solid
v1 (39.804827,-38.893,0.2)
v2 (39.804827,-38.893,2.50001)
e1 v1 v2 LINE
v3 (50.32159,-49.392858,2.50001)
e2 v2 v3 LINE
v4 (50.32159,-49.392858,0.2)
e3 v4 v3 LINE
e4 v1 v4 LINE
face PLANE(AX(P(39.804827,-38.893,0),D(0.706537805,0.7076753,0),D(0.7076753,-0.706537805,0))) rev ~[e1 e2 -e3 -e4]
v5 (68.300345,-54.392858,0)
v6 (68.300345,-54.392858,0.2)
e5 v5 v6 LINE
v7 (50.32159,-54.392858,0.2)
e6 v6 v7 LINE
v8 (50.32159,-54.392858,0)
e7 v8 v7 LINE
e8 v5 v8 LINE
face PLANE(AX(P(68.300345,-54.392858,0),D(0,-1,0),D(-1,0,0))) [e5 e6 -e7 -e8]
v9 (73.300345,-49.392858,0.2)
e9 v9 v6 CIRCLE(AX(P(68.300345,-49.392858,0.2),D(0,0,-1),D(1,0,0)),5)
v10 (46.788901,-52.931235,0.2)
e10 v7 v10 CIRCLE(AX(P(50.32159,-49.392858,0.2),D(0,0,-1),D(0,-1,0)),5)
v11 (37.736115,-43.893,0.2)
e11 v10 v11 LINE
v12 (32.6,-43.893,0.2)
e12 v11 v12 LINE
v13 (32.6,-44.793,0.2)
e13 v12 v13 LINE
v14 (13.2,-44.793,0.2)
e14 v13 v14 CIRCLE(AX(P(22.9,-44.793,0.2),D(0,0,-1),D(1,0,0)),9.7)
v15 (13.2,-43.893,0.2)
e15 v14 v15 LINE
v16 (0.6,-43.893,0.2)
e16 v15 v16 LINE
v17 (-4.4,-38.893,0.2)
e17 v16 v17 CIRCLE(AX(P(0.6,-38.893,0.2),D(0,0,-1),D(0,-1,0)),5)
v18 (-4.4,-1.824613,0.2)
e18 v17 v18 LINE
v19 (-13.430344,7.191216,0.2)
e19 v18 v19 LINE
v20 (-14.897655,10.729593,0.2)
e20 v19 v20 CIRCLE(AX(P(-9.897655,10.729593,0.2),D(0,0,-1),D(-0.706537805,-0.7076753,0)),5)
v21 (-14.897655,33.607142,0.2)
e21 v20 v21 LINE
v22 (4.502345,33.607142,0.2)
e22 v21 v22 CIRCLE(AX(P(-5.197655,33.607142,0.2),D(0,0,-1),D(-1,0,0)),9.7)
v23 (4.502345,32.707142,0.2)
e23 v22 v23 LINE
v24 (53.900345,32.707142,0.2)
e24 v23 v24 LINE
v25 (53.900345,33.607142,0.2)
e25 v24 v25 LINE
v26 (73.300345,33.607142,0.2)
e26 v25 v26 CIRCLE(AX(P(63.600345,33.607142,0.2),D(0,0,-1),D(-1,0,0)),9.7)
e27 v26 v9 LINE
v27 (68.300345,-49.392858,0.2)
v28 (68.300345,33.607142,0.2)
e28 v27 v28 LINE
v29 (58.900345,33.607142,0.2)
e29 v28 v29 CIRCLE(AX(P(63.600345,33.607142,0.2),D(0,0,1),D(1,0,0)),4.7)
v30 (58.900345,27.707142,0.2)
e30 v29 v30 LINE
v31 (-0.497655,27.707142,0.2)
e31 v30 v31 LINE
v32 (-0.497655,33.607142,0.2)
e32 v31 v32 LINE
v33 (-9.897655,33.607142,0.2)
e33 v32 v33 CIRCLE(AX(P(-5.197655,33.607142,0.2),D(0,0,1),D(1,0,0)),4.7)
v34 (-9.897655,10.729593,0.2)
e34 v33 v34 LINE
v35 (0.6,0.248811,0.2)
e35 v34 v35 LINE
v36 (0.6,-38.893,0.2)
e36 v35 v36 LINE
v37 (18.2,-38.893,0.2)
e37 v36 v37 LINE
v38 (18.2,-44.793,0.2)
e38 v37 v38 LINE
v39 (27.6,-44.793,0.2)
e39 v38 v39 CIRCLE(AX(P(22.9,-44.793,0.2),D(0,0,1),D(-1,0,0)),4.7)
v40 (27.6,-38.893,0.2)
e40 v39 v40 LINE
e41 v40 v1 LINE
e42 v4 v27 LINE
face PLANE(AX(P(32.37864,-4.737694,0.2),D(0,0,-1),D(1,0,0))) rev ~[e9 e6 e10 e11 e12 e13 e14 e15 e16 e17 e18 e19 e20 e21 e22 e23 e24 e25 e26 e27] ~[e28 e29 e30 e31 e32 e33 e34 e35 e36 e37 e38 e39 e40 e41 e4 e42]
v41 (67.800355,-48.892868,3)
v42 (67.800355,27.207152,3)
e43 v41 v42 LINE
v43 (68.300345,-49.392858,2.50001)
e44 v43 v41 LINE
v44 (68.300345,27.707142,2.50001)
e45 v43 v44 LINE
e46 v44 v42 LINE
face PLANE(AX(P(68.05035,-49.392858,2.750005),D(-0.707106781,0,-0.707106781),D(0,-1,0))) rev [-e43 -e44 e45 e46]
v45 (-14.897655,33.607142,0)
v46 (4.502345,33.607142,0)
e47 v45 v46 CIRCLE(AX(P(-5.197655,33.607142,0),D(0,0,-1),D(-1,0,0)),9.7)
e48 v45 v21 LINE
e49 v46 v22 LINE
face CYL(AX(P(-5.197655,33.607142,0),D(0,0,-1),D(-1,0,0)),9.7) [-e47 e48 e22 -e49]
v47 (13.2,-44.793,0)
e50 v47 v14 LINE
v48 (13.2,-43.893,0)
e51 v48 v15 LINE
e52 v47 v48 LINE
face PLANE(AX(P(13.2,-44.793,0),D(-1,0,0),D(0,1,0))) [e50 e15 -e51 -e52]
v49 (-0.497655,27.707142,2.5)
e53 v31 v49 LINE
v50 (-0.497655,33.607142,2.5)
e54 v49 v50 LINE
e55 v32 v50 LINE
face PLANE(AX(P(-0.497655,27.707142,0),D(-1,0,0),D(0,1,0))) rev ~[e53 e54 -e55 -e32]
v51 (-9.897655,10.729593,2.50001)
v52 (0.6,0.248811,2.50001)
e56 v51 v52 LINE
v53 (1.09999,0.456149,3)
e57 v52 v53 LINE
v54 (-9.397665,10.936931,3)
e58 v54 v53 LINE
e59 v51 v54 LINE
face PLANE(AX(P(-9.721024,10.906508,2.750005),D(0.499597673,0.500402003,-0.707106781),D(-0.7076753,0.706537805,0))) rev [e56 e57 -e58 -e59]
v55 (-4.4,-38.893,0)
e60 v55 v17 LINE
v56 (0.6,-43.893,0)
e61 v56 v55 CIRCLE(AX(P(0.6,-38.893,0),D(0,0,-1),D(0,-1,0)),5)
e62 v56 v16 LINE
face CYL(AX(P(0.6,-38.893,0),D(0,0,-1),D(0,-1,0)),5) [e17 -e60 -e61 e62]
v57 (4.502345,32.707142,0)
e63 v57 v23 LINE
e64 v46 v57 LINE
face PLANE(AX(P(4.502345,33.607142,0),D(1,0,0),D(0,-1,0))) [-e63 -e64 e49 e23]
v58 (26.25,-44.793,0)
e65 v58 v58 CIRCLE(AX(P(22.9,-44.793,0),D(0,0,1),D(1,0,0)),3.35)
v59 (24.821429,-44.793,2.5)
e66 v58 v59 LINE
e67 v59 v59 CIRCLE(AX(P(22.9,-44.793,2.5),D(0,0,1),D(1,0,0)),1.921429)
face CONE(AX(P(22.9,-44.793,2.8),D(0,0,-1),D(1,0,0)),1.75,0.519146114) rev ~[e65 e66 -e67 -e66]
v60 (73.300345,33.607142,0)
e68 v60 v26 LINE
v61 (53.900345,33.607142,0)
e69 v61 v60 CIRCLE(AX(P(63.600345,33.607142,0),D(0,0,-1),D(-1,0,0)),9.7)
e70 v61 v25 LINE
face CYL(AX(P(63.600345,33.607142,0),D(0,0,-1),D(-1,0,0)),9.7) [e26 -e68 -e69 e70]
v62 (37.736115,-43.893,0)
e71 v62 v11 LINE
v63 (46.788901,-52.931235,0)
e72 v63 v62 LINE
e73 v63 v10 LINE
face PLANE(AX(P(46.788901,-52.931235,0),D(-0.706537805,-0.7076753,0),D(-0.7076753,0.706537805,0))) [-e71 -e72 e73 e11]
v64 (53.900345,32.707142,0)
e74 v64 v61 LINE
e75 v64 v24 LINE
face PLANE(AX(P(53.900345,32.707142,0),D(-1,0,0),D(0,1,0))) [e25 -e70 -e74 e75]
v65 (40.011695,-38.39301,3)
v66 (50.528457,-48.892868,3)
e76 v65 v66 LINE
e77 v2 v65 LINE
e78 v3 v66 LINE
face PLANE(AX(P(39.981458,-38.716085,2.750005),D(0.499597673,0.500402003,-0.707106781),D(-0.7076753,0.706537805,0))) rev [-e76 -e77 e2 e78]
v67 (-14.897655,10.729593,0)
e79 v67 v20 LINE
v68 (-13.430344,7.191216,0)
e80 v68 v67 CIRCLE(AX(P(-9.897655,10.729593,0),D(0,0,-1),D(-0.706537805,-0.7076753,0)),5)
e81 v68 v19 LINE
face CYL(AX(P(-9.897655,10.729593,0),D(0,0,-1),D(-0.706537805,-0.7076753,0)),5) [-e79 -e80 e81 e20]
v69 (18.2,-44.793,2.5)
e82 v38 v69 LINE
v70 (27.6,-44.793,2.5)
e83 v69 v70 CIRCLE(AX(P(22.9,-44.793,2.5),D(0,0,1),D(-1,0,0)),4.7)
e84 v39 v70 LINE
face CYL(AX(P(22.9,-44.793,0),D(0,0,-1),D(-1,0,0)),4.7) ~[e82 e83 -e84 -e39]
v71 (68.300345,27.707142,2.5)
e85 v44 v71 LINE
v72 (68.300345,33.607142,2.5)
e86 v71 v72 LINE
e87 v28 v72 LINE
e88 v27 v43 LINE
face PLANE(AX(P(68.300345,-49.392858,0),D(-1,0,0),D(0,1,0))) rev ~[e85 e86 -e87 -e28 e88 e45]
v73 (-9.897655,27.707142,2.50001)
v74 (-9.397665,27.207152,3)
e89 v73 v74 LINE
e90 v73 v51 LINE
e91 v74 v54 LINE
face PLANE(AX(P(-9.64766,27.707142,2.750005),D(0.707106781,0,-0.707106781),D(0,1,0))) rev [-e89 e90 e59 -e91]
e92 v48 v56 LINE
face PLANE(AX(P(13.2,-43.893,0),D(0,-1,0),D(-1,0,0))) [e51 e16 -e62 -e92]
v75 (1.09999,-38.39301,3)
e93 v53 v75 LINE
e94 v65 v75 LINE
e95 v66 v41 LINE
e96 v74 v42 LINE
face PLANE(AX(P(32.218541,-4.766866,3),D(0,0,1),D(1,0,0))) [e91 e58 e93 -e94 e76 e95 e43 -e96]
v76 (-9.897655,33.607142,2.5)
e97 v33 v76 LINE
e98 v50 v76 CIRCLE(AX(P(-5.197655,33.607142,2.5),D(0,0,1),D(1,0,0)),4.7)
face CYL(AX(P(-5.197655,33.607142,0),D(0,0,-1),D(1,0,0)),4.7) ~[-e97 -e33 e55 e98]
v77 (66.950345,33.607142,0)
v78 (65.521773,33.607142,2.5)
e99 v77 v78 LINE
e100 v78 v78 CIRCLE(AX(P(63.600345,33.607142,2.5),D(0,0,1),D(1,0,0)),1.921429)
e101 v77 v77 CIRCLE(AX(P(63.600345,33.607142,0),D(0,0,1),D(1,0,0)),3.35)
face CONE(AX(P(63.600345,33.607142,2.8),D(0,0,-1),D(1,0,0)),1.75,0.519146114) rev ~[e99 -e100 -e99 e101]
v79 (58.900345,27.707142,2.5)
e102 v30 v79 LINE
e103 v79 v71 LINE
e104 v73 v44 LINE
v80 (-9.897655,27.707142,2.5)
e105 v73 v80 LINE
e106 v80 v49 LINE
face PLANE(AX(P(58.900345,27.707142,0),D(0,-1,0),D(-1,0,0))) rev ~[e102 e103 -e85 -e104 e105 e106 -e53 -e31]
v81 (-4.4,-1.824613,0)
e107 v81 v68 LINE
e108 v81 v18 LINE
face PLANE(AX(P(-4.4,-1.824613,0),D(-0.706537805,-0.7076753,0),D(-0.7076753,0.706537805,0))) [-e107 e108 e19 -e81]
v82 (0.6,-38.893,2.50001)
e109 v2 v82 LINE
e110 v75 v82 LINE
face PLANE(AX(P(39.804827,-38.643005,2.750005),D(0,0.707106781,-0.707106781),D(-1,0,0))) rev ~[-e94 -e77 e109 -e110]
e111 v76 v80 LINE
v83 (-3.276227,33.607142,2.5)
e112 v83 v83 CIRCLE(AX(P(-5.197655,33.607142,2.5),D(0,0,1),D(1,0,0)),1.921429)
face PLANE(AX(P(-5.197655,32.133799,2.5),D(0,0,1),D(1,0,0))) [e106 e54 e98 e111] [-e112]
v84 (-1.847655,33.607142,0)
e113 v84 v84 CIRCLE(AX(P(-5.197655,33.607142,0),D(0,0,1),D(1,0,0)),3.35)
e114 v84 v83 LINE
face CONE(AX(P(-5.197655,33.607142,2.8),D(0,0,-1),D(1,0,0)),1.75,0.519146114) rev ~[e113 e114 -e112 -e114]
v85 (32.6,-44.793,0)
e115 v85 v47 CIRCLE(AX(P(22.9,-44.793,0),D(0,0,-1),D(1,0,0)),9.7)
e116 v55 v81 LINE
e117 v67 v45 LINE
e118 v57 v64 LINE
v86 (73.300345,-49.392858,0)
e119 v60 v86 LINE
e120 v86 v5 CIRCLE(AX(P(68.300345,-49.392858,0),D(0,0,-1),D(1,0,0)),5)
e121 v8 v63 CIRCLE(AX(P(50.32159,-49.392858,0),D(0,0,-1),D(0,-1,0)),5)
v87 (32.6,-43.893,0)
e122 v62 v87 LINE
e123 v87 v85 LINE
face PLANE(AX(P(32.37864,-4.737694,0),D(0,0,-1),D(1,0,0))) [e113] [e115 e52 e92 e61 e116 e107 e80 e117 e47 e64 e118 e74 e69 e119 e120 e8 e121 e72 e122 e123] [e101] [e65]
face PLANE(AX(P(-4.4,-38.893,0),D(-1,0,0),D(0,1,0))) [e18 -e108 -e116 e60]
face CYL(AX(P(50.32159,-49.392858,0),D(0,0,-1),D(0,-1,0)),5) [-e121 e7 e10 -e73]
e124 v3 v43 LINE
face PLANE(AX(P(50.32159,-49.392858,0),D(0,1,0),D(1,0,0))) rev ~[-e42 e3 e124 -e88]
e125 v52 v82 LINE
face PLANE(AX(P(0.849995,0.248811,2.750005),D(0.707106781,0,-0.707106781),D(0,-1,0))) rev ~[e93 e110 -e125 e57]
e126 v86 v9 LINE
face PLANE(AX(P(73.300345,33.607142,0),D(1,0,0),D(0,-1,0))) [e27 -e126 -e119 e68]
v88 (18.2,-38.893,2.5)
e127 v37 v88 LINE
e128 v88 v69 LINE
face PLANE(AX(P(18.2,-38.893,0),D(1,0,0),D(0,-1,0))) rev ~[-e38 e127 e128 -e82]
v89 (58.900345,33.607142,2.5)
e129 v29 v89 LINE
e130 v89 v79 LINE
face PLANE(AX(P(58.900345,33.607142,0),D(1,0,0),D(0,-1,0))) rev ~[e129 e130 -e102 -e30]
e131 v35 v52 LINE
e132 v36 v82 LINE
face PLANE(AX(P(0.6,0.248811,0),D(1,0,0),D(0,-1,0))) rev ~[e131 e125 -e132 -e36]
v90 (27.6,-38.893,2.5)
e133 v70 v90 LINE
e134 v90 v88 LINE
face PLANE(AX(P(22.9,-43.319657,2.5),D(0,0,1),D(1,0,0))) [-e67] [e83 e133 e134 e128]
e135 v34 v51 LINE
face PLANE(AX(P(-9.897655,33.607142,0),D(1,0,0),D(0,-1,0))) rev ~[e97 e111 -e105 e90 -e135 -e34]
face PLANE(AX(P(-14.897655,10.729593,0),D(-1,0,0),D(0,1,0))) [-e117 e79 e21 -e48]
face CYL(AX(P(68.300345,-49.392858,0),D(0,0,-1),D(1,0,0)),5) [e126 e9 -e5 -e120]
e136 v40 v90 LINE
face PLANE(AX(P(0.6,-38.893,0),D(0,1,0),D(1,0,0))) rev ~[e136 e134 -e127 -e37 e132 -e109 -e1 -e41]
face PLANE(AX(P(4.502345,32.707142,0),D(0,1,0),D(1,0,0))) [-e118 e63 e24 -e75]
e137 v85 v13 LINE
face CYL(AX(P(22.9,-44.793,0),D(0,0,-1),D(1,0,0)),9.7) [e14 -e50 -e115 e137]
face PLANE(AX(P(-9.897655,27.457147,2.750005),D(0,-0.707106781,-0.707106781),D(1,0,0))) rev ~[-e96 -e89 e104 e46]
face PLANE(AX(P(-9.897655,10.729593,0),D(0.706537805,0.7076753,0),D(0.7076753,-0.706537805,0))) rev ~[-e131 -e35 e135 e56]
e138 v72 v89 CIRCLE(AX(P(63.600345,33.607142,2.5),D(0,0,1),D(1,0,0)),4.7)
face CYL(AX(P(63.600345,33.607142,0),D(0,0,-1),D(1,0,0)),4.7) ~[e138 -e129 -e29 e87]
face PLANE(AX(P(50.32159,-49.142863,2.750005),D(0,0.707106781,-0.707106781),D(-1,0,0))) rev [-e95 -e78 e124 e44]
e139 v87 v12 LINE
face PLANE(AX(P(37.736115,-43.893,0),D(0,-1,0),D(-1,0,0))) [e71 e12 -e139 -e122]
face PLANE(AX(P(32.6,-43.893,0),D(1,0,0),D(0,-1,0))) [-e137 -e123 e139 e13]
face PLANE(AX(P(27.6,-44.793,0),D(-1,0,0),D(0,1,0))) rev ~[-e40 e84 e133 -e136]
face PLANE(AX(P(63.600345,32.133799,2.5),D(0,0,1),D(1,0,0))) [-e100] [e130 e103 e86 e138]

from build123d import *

# Parameters (mm, degrees)
F0_R     = 1.75
F1_DEPTH = 3
F2_SIZE2 = 2.8
F2_SIZE  = 1.6
F4_DEPTH = 0.5
F5_SIZE  = 0.49999
F7_DEPTH = 0.2


# Not quite as in the source:
# - a fillet or chamfer is up to 0.001 mm smaller than in the source, because OpenCascade refuses the exact size


with BuildPart() as f1:
    # F0 (on Top) → F1 (new body)
    with BuildSketch(Plane.XY):
        with BuildLine():
            Line((18.2, -38.893), (18.2, -44.793))
            ThreePointArc((18.2, -44.793), (22.9, -49.493), (27.6, -44.793))
            Line((27.6, -44.793), (27.6, -38.893))
            Line((27.6, -38.893), (39.8048274606, -38.893))
            Line((39.8048274606, -38.893), (50.3215900894, -49.3928583233))
            Line((50.3215900894, -49.3928583233), (68.3003446043, -49.3928583233))
            Line((68.3003446043, -49.3928583233), (68.3003446043, 33.6071416767))
            ThreePointArc((68.3003446043, 33.6071416767), (63.6003446043, 38.3071416767), (58.9003446043, 33.6071416767))
            Line((58.9003446043, 33.6071416767), (58.9003446043, 27.7071416767))
            Line((58.9003446043, 27.7071416767), (-0.4976553957, 27.7071416767))
            Line((-0.4976553957, 27.7071416767), (-0.4976553957, 33.6071416767))
            ThreePointArc((-0.4976553957, 33.6071416767), (-5.1976553957, 38.3071416767), (-9.8976553957, 33.6071416767))
            Line((-9.8976553957, 33.6071416767), (-9.8976553957, 10.7295926865))
            Line((-9.8976553957, 10.7295926865), (0.6, 0.248810884))
            Line((0.6, 0.248810884), (0.6, -38.893))
            Line((0.6, -38.893), (18.2, -38.893))
        make_face()
        with Locations((22.9, -44.793)):
            Circle(F0_R, mode=Mode.SUBTRACT)
        with Locations((-5.1976553957, 33.6071416767)):
            Circle(F0_R, mode=Mode.SUBTRACT)
        with Locations((63.6003446043, 33.6071416767)):
            Circle(F0_R, mode=Mode.SUBTRACT)
    extrude(amount=F1_DEPTH)

    # F2
    f2_edges = [f1.edges().sort_by_distance(p)[0] for p in [
        (21.15, -44.793, 0),
        (-6.947655, 33.607142, 0),
        (61.850345, 33.607142, 0),
    ]]
    f2_side = f1.faces().sort_by_distance((33.412828, -5.806914, 0))[0]
    chamfer(f2_edges, length=F2_SIZE, length2=F2_SIZE2, reference=f2_side)

    # F3 (on face) → F4 (cut)
    with BuildSketch(Plane.XY.offset(3)):
        with BuildLine():
            Line((-9.8976553957, 27.7071416767), (-0.4976553957, 27.7071416767))
            Line((-0.4976553957, 27.7071416767), (-0.4976553957, 33.6071416767))
            ThreePointArc((-0.4976553957, 33.6071416767), (-5.1976553957, 38.3071416767), (-9.8976553957, 33.6071416767))
            Line((-9.8976553957, 33.6071416767), (-9.8976553957, 27.7071416767))
        make_face()
        with BuildLine():
            Line((58.9003446043, 33.6071416767), (58.9003446043, 27.7071416767))
            Line((58.9003446043, 27.7071416767), (68.3003446043, 27.7071416767))
            Line((68.3003446043, 27.7071416767), (68.3003446043, 33.6071416767))
            ThreePointArc((68.3003446043, 33.6071416767), (63.6003446043, 38.3071416767), (58.9003446043, 33.6071416767))
        make_face()
        with BuildLine():
            Line((27.6, -38.893), (18.2, -38.893))
            Line((18.2, -38.893), (18.2, -44.793))
            ThreePointArc((18.2, -44.793), (22.9, -49.493), (27.6, -44.793))
            Line((27.6, -44.793), (27.6, -38.893))
        make_face()
    extrude(amount=-F4_DEPTH, mode=Mode.SUBTRACT)

    # F5 (size 0.5 in the source; OpenCascade refuses exactly that, so slightly less here)
    f5_edges = [f1.edges().sort_by_distance(p)[0] for p in [
        (29.201345, 27.707142, 3),
        (-9.897655, 19.218367, 3),
        (-4.648828, 5.489202, 3),
        (0.6, -19.322095, 3),
        (20.202414, -38.893, 3),
        (45.063209, -44.142929, 3),
        (59.310967, -49.392858, 3),
        (68.300345, -10.842858, 3),
    ]]
    chamfer(f5_edges, length=F5_SIZE)

    # F6 (on face) → F7 (join)
    with BuildSketch(Plane(origin=(0, 0, 0), x_dir=(1, 0, 0), z_dir=(0, 0, -1))):
        with BuildLine():
            ThreePointArc((0.6, 43.893), (-2.9355339059, 42.4285339059), (-4.4, 38.893))
            Line((-4.4, 38.893), (-4.4, 1.824613149))
            Line((-4.4, 1.824613149), (-13.4303444218, -7.1912161881))
            ThreePointArc((-13.4303444218, -7.1912161881), (-14.5162831751, -8.8143179191), (-14.8976553957, -10.7295926865))
            Line((-14.8976553957, -10.7295926865), (-14.8976553957, -33.6071416767))
            ThreePointArc((-14.8976553957, -33.6071416767), (-5.1976553957, -43.3071416767), (4.5023446043, -33.6071416767))
            Line((4.5023446043, -33.6071416767), (4.5023446043, -32.7071416767))
            Line((4.5023446043, -32.7071416767), (53.9003446043, -32.7071416767))
            Line((53.9003446043, -32.7071416767), (53.9003446043, -33.6071416767))
            ThreePointArc((53.9003446043, -33.6071416767), (63.6003446043, -43.3071416767), (73.3003446043, -33.6071416767))
            Line((73.3003446043, -33.6071416767), (73.3003446043, 49.3928583233))
            ThreePointArc((73.3003446043, 49.3928583233), (71.8358785102, 52.9283922293), (68.3003446043, 54.3928583233))
            Line((68.3003446043, 54.3928583233), (50.3215900894, 54.3928583233))
            ThreePointArc((50.3215900894, 54.3928583233), (48.4100308427, 54.0130251219), (46.7889010633, 52.9312348218))
            Line((46.7889010633, 52.9312348218), (37.736115085, 43.893))
            Line((37.736115085, 43.893), (32.6, 43.893))
            Line((32.6, 43.893), (32.6, 44.793))
            ThreePointArc((32.6, 44.793), (22.9, 54.493), (13.2, 44.793))
            Line((13.2, 44.793), (13.2, 43.893))
            Line((13.2, 43.893), (0.6, 43.893))
        make_face()
        with BuildLine():
            Line((-9.8976553957, -33.6071416767), (-9.8976553957, -10.7295926865))
            Line((-9.8976553957, -10.7295926865), (0.6, -0.248810884))
            Line((0.6, -0.248810884), (0.6, 38.893))
            Line((0.6, 38.893), (18.2, 38.893))
            Line((18.2, 38.893), (18.2, 44.793))
            ThreePointArc((18.2, 44.793), (22.9, 49.493), (27.6, 44.793))
            Line((27.6, 44.793), (27.6, 38.893))
            Line((27.6, 38.893), (39.8048274606, 38.893))
            Line((39.8048274606, 38.893), (50.3215900894, 49.3928583233))
            Line((50.3215900894, 49.3928583233), (68.3003446043, 49.3928583233))
            Line((68.3003446043, 49.3928583233), (68.3003446043, -33.6071416767))
            ThreePointArc((68.3003446043, -33.6071416767), (63.6003446043, -38.3071416767), (58.9003446043, -33.6071416767))
            Line((58.9003446043, -33.6071416767), (58.9003446043, -27.7071416767))
            Line((58.9003446043, -27.7071416767), (-0.4976553957, -27.7071416767))
            Line((-0.4976553957, -27.7071416767), (-0.4976553957, -33.6071416767))
            ThreePointArc((-0.4976553957, -33.6071416767), (-5.1976553957, -38.3071416767), (-9.8976553957, -33.6071416767))
        make_face(mode=Mode.SUBTRACT)
    extrude(amount=-F7_DEPTH)


solid = f1.part
